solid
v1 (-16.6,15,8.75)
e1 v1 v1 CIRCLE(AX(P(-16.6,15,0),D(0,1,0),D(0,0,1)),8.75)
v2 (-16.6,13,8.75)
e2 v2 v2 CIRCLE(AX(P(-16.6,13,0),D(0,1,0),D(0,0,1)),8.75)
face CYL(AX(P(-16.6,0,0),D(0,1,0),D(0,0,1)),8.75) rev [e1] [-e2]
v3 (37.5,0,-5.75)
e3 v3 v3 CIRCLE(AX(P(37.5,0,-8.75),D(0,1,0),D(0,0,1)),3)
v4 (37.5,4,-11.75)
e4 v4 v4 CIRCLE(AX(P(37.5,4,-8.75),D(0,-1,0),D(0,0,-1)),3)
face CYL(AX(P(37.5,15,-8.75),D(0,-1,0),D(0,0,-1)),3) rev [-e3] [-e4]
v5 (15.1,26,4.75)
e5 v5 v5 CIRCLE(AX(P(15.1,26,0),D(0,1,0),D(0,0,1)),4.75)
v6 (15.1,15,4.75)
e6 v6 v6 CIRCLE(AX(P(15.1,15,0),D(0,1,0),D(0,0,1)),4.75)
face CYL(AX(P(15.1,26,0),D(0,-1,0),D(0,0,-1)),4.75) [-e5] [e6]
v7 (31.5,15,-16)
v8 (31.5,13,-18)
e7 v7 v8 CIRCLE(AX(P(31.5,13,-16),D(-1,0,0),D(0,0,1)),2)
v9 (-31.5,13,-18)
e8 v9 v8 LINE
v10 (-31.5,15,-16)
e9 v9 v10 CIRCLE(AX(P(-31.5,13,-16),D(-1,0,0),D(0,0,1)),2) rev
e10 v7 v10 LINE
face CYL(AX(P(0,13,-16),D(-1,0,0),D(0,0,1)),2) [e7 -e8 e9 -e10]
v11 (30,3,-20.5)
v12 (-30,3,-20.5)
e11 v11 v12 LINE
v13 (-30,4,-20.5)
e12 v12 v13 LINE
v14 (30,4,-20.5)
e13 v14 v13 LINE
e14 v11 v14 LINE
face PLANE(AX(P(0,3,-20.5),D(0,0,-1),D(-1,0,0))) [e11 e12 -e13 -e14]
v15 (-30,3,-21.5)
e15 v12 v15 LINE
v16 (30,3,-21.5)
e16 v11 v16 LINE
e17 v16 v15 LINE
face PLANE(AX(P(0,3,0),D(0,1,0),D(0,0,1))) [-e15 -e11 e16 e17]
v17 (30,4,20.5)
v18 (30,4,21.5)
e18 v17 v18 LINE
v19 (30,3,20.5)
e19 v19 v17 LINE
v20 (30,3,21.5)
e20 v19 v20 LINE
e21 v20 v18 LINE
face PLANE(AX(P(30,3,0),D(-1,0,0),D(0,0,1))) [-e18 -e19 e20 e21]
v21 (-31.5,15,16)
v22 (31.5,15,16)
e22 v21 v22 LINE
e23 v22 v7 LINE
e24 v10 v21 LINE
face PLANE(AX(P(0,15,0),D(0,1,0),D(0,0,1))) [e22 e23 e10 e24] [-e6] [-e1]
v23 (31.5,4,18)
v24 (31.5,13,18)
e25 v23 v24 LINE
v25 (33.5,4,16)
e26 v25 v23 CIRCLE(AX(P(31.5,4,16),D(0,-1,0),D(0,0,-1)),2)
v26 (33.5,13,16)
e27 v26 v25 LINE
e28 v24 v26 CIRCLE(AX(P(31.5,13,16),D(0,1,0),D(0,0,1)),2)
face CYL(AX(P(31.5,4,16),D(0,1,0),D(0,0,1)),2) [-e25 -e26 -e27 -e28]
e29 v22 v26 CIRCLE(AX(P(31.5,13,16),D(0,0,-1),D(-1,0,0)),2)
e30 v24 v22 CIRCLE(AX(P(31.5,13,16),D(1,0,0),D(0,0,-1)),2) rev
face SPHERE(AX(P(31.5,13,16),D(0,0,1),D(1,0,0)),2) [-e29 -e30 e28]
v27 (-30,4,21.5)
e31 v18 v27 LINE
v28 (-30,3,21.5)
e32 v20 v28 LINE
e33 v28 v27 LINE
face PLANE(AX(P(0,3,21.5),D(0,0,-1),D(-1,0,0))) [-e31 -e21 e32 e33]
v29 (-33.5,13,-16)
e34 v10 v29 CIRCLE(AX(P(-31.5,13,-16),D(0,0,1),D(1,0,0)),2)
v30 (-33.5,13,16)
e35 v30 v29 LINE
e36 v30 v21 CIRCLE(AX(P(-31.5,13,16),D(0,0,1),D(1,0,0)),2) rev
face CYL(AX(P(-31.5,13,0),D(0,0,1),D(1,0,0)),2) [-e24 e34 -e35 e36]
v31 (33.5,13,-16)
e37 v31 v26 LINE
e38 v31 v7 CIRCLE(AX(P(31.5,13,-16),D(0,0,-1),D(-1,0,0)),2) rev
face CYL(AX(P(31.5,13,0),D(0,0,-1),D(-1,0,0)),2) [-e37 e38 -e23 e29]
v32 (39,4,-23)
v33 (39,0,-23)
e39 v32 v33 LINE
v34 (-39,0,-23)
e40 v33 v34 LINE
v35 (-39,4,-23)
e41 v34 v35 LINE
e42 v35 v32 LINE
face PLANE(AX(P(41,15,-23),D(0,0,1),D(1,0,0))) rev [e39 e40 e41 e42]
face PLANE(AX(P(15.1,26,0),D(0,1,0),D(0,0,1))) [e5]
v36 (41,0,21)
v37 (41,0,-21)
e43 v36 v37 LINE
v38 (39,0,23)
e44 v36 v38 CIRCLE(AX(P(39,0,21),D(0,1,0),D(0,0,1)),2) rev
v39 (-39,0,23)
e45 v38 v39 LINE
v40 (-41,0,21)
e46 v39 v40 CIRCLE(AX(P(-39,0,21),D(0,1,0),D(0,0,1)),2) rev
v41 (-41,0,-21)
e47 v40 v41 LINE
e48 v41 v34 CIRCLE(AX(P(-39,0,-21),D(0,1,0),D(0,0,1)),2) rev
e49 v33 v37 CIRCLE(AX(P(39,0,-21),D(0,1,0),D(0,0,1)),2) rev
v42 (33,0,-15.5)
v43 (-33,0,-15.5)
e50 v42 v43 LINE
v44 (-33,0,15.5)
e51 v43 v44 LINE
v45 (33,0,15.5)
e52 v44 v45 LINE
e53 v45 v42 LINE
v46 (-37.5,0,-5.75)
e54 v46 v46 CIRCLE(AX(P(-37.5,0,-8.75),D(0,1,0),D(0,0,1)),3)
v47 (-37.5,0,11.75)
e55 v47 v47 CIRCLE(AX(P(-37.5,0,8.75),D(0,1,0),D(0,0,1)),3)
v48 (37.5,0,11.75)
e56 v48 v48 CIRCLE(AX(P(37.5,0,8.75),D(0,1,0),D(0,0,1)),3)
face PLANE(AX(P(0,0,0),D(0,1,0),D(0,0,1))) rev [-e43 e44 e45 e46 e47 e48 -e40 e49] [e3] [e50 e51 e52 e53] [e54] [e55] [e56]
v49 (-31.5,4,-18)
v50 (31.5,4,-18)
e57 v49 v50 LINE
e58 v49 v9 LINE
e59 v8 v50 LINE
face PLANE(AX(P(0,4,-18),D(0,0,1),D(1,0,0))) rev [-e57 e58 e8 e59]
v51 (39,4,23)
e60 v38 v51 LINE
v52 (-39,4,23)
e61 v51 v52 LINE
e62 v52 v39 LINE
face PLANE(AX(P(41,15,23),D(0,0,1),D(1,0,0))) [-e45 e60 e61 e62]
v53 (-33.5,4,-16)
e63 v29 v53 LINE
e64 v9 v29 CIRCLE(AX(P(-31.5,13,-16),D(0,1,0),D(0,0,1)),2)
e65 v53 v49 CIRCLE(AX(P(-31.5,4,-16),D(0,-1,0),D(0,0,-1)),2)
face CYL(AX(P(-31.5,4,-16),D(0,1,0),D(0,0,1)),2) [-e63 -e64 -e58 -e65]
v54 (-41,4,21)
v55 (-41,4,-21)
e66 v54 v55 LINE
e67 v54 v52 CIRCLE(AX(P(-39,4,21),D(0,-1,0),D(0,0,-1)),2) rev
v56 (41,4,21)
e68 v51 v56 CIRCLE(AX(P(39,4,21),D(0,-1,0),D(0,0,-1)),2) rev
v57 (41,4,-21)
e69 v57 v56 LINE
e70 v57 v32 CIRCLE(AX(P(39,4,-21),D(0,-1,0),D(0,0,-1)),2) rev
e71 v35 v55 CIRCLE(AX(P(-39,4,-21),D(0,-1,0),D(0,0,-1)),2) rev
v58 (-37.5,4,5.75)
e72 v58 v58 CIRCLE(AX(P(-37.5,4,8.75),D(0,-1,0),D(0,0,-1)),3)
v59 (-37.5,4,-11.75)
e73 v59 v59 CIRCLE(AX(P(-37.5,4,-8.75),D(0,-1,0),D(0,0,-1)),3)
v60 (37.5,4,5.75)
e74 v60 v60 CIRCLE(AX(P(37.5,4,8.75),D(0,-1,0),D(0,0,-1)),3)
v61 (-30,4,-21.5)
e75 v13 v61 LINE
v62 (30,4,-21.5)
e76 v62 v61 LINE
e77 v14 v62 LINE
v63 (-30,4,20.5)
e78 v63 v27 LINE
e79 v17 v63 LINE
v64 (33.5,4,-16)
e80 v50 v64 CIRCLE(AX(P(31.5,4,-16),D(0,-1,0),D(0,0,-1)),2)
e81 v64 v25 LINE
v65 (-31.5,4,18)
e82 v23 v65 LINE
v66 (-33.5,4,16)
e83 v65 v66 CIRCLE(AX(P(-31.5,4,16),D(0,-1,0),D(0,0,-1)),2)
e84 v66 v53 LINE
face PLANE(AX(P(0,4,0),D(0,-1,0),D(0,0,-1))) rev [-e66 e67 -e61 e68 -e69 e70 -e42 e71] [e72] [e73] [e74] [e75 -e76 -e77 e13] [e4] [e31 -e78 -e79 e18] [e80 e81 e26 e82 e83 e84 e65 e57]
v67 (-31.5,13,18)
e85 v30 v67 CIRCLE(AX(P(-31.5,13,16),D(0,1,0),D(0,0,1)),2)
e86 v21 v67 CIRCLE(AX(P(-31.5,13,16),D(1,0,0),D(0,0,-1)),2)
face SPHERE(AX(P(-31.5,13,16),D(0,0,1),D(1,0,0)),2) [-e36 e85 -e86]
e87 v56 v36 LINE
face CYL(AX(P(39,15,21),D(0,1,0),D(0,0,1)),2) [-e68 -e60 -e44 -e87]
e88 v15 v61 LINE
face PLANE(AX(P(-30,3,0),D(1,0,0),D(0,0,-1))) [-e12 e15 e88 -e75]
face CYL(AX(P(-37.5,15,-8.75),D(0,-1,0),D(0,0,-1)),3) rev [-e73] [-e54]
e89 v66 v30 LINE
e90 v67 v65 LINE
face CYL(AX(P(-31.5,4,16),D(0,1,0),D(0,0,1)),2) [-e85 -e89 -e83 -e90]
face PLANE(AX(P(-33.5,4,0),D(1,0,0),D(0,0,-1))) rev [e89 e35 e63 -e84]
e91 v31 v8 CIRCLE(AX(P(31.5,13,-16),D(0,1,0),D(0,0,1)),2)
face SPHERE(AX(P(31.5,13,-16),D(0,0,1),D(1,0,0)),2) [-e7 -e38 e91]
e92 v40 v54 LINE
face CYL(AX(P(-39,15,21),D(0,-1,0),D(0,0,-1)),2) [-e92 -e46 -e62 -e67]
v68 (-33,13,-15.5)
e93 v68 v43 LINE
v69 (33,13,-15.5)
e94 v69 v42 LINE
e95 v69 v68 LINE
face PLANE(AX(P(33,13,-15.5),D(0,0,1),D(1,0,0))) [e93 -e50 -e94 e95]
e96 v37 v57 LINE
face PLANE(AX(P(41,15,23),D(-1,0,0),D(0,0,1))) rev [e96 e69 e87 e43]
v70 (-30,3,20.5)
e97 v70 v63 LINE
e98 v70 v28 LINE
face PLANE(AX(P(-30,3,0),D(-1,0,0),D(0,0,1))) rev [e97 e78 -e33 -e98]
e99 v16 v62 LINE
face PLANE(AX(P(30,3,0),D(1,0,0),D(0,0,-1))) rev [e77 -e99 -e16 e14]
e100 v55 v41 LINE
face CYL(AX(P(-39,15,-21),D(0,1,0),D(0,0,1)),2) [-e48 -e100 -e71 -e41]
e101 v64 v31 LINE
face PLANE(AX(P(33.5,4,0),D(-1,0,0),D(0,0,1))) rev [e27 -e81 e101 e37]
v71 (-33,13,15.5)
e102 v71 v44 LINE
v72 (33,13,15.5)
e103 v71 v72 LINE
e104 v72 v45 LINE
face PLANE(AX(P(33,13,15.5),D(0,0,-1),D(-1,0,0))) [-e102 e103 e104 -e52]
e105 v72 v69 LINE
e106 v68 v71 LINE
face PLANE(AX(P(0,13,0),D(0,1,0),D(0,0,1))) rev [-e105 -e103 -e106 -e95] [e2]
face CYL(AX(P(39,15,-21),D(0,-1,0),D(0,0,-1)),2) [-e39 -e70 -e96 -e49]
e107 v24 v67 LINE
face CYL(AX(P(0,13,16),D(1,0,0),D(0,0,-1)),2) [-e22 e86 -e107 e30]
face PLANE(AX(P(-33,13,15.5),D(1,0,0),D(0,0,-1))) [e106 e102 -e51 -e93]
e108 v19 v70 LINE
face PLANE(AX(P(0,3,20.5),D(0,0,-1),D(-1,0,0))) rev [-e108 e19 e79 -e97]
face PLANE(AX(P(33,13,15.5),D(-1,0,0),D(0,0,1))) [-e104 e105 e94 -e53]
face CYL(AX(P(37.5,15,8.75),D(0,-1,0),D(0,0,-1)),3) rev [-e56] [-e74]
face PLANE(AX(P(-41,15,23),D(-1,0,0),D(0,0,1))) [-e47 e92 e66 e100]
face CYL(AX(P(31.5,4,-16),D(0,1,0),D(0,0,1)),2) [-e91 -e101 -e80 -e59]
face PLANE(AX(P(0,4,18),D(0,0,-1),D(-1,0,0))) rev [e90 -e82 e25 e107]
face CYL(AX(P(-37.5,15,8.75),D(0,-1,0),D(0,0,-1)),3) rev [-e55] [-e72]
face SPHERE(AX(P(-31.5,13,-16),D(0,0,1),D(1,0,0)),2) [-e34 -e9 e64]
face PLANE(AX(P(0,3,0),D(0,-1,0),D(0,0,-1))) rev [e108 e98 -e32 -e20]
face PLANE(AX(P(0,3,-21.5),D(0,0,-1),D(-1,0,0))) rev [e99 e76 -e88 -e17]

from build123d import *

# Parameters (mm, degrees)
ESQUISSE1_W             = 82
ESQUISSE1_H             = 46
ESQUISSE1_R             = 3
BOSS_EXTRU_1_DEPTH      = 15
ESQUISSE2_W             = 66
ESQUISSE2_H             = 31
ENL_V_MAT_EXTRU_1_DEPTH = 13
ENL_V_START             = 15
ESQUISSE3_R             = 8.75
ENL_V_MAT_EXTRU_2_DEPTH = 65.345719166
ESQUISSE4_W             = 67
ESQUISSE4_H             = 36
ENL_V_MAT_EXTRU_3_DEPTH = 11
BOSS_EXTRU_3_START      = 15
ESQUISSE5_R             = 4.75
BOSS_EXTRU_3_DEPTH      = 11
ENL_V_START_2           = 4
ESQUISSE1_4_W           = 60
ESQUISSE1_4_H           = 1
ENL_V_MAT_EXTRU_4_DEPTH = 1
CONG_1_R                = 2
CONG_2_R                = 2
CONG_4_R                = 2


with BuildPart() as part:
    # Esquisse1 → Boss.-Extru.1 (new body)
    with BuildSketch(Plane(origin=(0, 0, 0), x_dir=(1, 0, 0), z_dir=(0, 1, 0))):
        Rectangle(ESQUISSE1_W, ESQUISSE1_H)
        with Locations(Location((-37.5, 8.75, 0), (0, 0, 270))):
            Circle(ESQUISSE1_R, mode=Mode.SUBTRACT)
        with Locations(Location((37.5, 8.75, 0), (0, 0, 270))):
            Circle(ESQUISSE1_R, mode=Mode.SUBTRACT)
        with Locations(Location((37.5, -8.75, 0), (0, 0, 270))):
            Circle(ESQUISSE1_R, mode=Mode.SUBTRACT)
        with Locations(Location((-37.5, -8.75, 0), (0, 0, 270))):
            Circle(ESQUISSE1_R, mode=Mode.SUBTRACT)
    extrude(amount=BOSS_EXTRU_1_DEPTH)

    # Esquisse2 → Enlèv. mat.-Extru.1 (cut)
    with BuildSketch(Plane(origin=(0, 0, 0), x_dir=(1, 0, 0), z_dir=(0, 1, 0))):
        Rectangle(ESQUISSE2_W, ESQUISSE2_H)
    extrude(amount=ENL_V_MAT_EXTRU_1_DEPTH, mode=Mode.SUBTRACT)

    # Esquisse3 → Enlèv. mat.-Extru.2 (cut, through all)
    with BuildSketch(Plane(origin=(0, 0, 0), x_dir=(1, 0, 0), z_dir=(0, 1, 0)).offset(ENL_V_START)):
        with Locations(Location((-16.6, 0, 0), (0, 0, 270))):
            Circle(ESQUISSE3_R)
    extrude(amount=-ENL_V_MAT_EXTRU_2_DEPTH, mode=Mode.SUBTRACT)

    # Esquisse4 → Enlèv. mat.-Extru.3 (cut)
    with BuildSketch(Plane(origin=(0, 0, 0), x_dir=(1, 0, 0), z_dir=(0, 1, 0)).offset(ENL_V_START)):
        Polygon((-33.5, -23), (-41, -23), (-41, 23), (-33.5, 23), (33.5, 23), (41, 23), (41, -23), (33.5, -23), align=None)
        Rectangle(ESQUISSE4_W, ESQUISSE4_H, mode=Mode.SUBTRACT)
    extrude(amount=-ENL_V_MAT_EXTRU_3_DEPTH, mode=Mode.SUBTRACT)

    # Esquisse5 → Boss.-Extru.3 (add)
    with BuildSketch(Plane(origin=(0, 0, 0), x_dir=(1, 0, 0), z_dir=(0, 1, 0)).offset(BOSS_EXTRU_3_START)):
        with Locations(Location((15.1, 0, 0), (0, 0, 270))):
            Circle(ESQUISSE5_R)
    extrude(amount=BOSS_EXTRU_3_DEPTH)

    # Esquisse1<4> → Enlèv. mat.-Extru.4 (cut)
    with BuildSketch(Plane(origin=(0, 0, 0), x_dir=(1, 0, 0), z_dir=(0, 1, 0)).offset(ENL_V_START_2)):
        with Locations((0, -21)):
            Rectangle(ESQUISSE1_4_W, ESQUISSE1_4_H)
        with Locations((0, 21)):
            Rectangle(ESQUISSE1_4_W, ESQUISSE1_4_H)
    extrude(amount=-ENL_V_MAT_EXTRU_4_DEPTH, mode=Mode.SUBTRACT)

    # Congé1
    cong_1_edges = [part.edges().sort_by_distance(p)[0] for p in [
        (0, 15, 18),
        (-33.5, 15, 0),
        (0, 15, -18),
        (33.5, 15, 0),
    ]]
    fillet(cong_1_edges, radius=CONG_1_R)

    # Congé2
    # the kernel refuses this fillet: 2 mm, written as the material it takes off along each edge
    with BuildSketch(Plane(origin=(-31.5, 13, -16), x_dir=(0, 0, -1), z_dir=(-1, 0, 0))) as cong_2_piece_1_section:
        Polygon((0, 0), (CONG_2_R, 0), (CONG_2_R, -CONG_2_R), (0, -CONG_2_R), align=None)
    cong_2_piece_1 = extrude(amount=CONG_2_R, mode=Mode.PRIVATE)
    cong_2_piece_1 = cong_2_piece_1 - Plane(origin=(-31.5, 13, -16), x_dir=(0, -0.7071067811865475, 0.7071067811865475), z_dir=(-1, 0, 0)) * Sphere(CONG_2_R, mode=Mode.PRIVATE)
    add(cong_2_piece_1, mode=Mode.SUBTRACT)
    with BuildSketch(Plane(origin=(-31.5, 13, 16), x_dir=(-1, 0, 0), z_dir=(0, 0, 1))) as cong_2_piece_2_section:
        Polygon((0, 0), (CONG_2_R, 0), (CONG_2_R, -CONG_2_R), (0, -CONG_2_R), align=None)
    cong_2_piece_2 = extrude(amount=CONG_2_R, mode=Mode.PRIVATE)
    cong_2_piece_2 = cong_2_piece_2 - Plane(origin=(-31.5, 13, 16), x_dir=(0.7071067811865475, -0.7071067811865475, 0), z_dir=(0, 0, 1)) * Sphere(CONG_2_R, mode=Mode.PRIVATE)
    add(cong_2_piece_2, mode=Mode.SUBTRACT)
    with BuildSketch(Plane(origin=(31.5, 13, -16), x_dir=(0, 0, -1), z_dir=(1, 0, 0))) as cong_2_piece_3_section:
        Polygon((0, 0), (CONG_2_R, 0), (CONG_2_R, CONG_2_R), (0, CONG_2_R), align=None)
    cong_2_piece_3 = extrude(amount=CONG_2_R, mode=Mode.PRIVATE)
    cong_2_piece_3 = cong_2_piece_3 - Plane(origin=(31.5, 13, -16), x_dir=(0, -0.7071067811865475, 0.7071067811865475), z_dir=(1, 0, 0)) * Sphere(CONG_2_R, mode=Mode.PRIVATE)
    add(cong_2_piece_3, mode=Mode.SUBTRACT)
    with BuildSketch(Plane(origin=(31.5, 13, 16), x_dir=(1, 0, 0), z_dir=(0, 0, 1))) as cong_2_piece_4_section:
        Polygon((0, 0), (CONG_2_R, 0), (CONG_2_R, CONG_2_R), (0, CONG_2_R), align=None)
    cong_2_piece_4 = extrude(amount=CONG_2_R, mode=Mode.PRIVATE)
    cong_2_piece_4 = cong_2_piece_4 - Plane(origin=(31.5, 13, 16), x_dir=(-0.7071067811865475, -0.7071067811865475, 0), z_dir=(0, 0, 1)) * Sphere(CONG_2_R, mode=Mode.PRIVATE)
    add(cong_2_piece_4, mode=Mode.SUBTRACT)
    with BuildSketch(Plane(origin=(-33.5, 13, 18), x_dir=(1, 0, 0), z_dir=(0, -1, 0)), Plane(origin=(-33.5, 13, -18), x_dir=(0, 0, 1), z_dir=(0, -1, 0))) as cong_2_piece_5:
        with BuildLine():
            CenterArc((CONG_2_R, -CONG_2_R), CONG_2_R, 90, 90)
            Line((0, -CONG_2_R), (0, 0))
            Line((0, 0), (CONG_2_R, 0))
        make_face()
    extrude(amount=9, mode=Mode.SUBTRACT)
    with BuildSketch(Plane(origin=(33.5, 13, -18), x_dir=(0, 0, 1), z_dir=(0, -1, 0)), Plane(origin=(33.5, 13, 18), x_dir=(-1, 0, 0), z_dir=(0, -1, 0))) as cong_2_piece_6:
        with BuildLine():
            CenterArc((CONG_2_R, CONG_2_R), CONG_2_R, 180, 90)
            Line((0, CONG_2_R), (0, 0))
            Line((0, 0), (CONG_2_R, 0))
        make_face()
    extrude(amount=9, mode=Mode.SUBTRACT)

    # Congé4
    cong_4_edges = [part.edges().sort_by_distance(p)[0] for p in [
        (41, 2, 23),
        (-41, 2, 23),
        (-41, 2, -23),
        (41, 2, -23),
    ]]
    fillet(cong_4_edges, radius=CONG_4_R)


solid = part.part
